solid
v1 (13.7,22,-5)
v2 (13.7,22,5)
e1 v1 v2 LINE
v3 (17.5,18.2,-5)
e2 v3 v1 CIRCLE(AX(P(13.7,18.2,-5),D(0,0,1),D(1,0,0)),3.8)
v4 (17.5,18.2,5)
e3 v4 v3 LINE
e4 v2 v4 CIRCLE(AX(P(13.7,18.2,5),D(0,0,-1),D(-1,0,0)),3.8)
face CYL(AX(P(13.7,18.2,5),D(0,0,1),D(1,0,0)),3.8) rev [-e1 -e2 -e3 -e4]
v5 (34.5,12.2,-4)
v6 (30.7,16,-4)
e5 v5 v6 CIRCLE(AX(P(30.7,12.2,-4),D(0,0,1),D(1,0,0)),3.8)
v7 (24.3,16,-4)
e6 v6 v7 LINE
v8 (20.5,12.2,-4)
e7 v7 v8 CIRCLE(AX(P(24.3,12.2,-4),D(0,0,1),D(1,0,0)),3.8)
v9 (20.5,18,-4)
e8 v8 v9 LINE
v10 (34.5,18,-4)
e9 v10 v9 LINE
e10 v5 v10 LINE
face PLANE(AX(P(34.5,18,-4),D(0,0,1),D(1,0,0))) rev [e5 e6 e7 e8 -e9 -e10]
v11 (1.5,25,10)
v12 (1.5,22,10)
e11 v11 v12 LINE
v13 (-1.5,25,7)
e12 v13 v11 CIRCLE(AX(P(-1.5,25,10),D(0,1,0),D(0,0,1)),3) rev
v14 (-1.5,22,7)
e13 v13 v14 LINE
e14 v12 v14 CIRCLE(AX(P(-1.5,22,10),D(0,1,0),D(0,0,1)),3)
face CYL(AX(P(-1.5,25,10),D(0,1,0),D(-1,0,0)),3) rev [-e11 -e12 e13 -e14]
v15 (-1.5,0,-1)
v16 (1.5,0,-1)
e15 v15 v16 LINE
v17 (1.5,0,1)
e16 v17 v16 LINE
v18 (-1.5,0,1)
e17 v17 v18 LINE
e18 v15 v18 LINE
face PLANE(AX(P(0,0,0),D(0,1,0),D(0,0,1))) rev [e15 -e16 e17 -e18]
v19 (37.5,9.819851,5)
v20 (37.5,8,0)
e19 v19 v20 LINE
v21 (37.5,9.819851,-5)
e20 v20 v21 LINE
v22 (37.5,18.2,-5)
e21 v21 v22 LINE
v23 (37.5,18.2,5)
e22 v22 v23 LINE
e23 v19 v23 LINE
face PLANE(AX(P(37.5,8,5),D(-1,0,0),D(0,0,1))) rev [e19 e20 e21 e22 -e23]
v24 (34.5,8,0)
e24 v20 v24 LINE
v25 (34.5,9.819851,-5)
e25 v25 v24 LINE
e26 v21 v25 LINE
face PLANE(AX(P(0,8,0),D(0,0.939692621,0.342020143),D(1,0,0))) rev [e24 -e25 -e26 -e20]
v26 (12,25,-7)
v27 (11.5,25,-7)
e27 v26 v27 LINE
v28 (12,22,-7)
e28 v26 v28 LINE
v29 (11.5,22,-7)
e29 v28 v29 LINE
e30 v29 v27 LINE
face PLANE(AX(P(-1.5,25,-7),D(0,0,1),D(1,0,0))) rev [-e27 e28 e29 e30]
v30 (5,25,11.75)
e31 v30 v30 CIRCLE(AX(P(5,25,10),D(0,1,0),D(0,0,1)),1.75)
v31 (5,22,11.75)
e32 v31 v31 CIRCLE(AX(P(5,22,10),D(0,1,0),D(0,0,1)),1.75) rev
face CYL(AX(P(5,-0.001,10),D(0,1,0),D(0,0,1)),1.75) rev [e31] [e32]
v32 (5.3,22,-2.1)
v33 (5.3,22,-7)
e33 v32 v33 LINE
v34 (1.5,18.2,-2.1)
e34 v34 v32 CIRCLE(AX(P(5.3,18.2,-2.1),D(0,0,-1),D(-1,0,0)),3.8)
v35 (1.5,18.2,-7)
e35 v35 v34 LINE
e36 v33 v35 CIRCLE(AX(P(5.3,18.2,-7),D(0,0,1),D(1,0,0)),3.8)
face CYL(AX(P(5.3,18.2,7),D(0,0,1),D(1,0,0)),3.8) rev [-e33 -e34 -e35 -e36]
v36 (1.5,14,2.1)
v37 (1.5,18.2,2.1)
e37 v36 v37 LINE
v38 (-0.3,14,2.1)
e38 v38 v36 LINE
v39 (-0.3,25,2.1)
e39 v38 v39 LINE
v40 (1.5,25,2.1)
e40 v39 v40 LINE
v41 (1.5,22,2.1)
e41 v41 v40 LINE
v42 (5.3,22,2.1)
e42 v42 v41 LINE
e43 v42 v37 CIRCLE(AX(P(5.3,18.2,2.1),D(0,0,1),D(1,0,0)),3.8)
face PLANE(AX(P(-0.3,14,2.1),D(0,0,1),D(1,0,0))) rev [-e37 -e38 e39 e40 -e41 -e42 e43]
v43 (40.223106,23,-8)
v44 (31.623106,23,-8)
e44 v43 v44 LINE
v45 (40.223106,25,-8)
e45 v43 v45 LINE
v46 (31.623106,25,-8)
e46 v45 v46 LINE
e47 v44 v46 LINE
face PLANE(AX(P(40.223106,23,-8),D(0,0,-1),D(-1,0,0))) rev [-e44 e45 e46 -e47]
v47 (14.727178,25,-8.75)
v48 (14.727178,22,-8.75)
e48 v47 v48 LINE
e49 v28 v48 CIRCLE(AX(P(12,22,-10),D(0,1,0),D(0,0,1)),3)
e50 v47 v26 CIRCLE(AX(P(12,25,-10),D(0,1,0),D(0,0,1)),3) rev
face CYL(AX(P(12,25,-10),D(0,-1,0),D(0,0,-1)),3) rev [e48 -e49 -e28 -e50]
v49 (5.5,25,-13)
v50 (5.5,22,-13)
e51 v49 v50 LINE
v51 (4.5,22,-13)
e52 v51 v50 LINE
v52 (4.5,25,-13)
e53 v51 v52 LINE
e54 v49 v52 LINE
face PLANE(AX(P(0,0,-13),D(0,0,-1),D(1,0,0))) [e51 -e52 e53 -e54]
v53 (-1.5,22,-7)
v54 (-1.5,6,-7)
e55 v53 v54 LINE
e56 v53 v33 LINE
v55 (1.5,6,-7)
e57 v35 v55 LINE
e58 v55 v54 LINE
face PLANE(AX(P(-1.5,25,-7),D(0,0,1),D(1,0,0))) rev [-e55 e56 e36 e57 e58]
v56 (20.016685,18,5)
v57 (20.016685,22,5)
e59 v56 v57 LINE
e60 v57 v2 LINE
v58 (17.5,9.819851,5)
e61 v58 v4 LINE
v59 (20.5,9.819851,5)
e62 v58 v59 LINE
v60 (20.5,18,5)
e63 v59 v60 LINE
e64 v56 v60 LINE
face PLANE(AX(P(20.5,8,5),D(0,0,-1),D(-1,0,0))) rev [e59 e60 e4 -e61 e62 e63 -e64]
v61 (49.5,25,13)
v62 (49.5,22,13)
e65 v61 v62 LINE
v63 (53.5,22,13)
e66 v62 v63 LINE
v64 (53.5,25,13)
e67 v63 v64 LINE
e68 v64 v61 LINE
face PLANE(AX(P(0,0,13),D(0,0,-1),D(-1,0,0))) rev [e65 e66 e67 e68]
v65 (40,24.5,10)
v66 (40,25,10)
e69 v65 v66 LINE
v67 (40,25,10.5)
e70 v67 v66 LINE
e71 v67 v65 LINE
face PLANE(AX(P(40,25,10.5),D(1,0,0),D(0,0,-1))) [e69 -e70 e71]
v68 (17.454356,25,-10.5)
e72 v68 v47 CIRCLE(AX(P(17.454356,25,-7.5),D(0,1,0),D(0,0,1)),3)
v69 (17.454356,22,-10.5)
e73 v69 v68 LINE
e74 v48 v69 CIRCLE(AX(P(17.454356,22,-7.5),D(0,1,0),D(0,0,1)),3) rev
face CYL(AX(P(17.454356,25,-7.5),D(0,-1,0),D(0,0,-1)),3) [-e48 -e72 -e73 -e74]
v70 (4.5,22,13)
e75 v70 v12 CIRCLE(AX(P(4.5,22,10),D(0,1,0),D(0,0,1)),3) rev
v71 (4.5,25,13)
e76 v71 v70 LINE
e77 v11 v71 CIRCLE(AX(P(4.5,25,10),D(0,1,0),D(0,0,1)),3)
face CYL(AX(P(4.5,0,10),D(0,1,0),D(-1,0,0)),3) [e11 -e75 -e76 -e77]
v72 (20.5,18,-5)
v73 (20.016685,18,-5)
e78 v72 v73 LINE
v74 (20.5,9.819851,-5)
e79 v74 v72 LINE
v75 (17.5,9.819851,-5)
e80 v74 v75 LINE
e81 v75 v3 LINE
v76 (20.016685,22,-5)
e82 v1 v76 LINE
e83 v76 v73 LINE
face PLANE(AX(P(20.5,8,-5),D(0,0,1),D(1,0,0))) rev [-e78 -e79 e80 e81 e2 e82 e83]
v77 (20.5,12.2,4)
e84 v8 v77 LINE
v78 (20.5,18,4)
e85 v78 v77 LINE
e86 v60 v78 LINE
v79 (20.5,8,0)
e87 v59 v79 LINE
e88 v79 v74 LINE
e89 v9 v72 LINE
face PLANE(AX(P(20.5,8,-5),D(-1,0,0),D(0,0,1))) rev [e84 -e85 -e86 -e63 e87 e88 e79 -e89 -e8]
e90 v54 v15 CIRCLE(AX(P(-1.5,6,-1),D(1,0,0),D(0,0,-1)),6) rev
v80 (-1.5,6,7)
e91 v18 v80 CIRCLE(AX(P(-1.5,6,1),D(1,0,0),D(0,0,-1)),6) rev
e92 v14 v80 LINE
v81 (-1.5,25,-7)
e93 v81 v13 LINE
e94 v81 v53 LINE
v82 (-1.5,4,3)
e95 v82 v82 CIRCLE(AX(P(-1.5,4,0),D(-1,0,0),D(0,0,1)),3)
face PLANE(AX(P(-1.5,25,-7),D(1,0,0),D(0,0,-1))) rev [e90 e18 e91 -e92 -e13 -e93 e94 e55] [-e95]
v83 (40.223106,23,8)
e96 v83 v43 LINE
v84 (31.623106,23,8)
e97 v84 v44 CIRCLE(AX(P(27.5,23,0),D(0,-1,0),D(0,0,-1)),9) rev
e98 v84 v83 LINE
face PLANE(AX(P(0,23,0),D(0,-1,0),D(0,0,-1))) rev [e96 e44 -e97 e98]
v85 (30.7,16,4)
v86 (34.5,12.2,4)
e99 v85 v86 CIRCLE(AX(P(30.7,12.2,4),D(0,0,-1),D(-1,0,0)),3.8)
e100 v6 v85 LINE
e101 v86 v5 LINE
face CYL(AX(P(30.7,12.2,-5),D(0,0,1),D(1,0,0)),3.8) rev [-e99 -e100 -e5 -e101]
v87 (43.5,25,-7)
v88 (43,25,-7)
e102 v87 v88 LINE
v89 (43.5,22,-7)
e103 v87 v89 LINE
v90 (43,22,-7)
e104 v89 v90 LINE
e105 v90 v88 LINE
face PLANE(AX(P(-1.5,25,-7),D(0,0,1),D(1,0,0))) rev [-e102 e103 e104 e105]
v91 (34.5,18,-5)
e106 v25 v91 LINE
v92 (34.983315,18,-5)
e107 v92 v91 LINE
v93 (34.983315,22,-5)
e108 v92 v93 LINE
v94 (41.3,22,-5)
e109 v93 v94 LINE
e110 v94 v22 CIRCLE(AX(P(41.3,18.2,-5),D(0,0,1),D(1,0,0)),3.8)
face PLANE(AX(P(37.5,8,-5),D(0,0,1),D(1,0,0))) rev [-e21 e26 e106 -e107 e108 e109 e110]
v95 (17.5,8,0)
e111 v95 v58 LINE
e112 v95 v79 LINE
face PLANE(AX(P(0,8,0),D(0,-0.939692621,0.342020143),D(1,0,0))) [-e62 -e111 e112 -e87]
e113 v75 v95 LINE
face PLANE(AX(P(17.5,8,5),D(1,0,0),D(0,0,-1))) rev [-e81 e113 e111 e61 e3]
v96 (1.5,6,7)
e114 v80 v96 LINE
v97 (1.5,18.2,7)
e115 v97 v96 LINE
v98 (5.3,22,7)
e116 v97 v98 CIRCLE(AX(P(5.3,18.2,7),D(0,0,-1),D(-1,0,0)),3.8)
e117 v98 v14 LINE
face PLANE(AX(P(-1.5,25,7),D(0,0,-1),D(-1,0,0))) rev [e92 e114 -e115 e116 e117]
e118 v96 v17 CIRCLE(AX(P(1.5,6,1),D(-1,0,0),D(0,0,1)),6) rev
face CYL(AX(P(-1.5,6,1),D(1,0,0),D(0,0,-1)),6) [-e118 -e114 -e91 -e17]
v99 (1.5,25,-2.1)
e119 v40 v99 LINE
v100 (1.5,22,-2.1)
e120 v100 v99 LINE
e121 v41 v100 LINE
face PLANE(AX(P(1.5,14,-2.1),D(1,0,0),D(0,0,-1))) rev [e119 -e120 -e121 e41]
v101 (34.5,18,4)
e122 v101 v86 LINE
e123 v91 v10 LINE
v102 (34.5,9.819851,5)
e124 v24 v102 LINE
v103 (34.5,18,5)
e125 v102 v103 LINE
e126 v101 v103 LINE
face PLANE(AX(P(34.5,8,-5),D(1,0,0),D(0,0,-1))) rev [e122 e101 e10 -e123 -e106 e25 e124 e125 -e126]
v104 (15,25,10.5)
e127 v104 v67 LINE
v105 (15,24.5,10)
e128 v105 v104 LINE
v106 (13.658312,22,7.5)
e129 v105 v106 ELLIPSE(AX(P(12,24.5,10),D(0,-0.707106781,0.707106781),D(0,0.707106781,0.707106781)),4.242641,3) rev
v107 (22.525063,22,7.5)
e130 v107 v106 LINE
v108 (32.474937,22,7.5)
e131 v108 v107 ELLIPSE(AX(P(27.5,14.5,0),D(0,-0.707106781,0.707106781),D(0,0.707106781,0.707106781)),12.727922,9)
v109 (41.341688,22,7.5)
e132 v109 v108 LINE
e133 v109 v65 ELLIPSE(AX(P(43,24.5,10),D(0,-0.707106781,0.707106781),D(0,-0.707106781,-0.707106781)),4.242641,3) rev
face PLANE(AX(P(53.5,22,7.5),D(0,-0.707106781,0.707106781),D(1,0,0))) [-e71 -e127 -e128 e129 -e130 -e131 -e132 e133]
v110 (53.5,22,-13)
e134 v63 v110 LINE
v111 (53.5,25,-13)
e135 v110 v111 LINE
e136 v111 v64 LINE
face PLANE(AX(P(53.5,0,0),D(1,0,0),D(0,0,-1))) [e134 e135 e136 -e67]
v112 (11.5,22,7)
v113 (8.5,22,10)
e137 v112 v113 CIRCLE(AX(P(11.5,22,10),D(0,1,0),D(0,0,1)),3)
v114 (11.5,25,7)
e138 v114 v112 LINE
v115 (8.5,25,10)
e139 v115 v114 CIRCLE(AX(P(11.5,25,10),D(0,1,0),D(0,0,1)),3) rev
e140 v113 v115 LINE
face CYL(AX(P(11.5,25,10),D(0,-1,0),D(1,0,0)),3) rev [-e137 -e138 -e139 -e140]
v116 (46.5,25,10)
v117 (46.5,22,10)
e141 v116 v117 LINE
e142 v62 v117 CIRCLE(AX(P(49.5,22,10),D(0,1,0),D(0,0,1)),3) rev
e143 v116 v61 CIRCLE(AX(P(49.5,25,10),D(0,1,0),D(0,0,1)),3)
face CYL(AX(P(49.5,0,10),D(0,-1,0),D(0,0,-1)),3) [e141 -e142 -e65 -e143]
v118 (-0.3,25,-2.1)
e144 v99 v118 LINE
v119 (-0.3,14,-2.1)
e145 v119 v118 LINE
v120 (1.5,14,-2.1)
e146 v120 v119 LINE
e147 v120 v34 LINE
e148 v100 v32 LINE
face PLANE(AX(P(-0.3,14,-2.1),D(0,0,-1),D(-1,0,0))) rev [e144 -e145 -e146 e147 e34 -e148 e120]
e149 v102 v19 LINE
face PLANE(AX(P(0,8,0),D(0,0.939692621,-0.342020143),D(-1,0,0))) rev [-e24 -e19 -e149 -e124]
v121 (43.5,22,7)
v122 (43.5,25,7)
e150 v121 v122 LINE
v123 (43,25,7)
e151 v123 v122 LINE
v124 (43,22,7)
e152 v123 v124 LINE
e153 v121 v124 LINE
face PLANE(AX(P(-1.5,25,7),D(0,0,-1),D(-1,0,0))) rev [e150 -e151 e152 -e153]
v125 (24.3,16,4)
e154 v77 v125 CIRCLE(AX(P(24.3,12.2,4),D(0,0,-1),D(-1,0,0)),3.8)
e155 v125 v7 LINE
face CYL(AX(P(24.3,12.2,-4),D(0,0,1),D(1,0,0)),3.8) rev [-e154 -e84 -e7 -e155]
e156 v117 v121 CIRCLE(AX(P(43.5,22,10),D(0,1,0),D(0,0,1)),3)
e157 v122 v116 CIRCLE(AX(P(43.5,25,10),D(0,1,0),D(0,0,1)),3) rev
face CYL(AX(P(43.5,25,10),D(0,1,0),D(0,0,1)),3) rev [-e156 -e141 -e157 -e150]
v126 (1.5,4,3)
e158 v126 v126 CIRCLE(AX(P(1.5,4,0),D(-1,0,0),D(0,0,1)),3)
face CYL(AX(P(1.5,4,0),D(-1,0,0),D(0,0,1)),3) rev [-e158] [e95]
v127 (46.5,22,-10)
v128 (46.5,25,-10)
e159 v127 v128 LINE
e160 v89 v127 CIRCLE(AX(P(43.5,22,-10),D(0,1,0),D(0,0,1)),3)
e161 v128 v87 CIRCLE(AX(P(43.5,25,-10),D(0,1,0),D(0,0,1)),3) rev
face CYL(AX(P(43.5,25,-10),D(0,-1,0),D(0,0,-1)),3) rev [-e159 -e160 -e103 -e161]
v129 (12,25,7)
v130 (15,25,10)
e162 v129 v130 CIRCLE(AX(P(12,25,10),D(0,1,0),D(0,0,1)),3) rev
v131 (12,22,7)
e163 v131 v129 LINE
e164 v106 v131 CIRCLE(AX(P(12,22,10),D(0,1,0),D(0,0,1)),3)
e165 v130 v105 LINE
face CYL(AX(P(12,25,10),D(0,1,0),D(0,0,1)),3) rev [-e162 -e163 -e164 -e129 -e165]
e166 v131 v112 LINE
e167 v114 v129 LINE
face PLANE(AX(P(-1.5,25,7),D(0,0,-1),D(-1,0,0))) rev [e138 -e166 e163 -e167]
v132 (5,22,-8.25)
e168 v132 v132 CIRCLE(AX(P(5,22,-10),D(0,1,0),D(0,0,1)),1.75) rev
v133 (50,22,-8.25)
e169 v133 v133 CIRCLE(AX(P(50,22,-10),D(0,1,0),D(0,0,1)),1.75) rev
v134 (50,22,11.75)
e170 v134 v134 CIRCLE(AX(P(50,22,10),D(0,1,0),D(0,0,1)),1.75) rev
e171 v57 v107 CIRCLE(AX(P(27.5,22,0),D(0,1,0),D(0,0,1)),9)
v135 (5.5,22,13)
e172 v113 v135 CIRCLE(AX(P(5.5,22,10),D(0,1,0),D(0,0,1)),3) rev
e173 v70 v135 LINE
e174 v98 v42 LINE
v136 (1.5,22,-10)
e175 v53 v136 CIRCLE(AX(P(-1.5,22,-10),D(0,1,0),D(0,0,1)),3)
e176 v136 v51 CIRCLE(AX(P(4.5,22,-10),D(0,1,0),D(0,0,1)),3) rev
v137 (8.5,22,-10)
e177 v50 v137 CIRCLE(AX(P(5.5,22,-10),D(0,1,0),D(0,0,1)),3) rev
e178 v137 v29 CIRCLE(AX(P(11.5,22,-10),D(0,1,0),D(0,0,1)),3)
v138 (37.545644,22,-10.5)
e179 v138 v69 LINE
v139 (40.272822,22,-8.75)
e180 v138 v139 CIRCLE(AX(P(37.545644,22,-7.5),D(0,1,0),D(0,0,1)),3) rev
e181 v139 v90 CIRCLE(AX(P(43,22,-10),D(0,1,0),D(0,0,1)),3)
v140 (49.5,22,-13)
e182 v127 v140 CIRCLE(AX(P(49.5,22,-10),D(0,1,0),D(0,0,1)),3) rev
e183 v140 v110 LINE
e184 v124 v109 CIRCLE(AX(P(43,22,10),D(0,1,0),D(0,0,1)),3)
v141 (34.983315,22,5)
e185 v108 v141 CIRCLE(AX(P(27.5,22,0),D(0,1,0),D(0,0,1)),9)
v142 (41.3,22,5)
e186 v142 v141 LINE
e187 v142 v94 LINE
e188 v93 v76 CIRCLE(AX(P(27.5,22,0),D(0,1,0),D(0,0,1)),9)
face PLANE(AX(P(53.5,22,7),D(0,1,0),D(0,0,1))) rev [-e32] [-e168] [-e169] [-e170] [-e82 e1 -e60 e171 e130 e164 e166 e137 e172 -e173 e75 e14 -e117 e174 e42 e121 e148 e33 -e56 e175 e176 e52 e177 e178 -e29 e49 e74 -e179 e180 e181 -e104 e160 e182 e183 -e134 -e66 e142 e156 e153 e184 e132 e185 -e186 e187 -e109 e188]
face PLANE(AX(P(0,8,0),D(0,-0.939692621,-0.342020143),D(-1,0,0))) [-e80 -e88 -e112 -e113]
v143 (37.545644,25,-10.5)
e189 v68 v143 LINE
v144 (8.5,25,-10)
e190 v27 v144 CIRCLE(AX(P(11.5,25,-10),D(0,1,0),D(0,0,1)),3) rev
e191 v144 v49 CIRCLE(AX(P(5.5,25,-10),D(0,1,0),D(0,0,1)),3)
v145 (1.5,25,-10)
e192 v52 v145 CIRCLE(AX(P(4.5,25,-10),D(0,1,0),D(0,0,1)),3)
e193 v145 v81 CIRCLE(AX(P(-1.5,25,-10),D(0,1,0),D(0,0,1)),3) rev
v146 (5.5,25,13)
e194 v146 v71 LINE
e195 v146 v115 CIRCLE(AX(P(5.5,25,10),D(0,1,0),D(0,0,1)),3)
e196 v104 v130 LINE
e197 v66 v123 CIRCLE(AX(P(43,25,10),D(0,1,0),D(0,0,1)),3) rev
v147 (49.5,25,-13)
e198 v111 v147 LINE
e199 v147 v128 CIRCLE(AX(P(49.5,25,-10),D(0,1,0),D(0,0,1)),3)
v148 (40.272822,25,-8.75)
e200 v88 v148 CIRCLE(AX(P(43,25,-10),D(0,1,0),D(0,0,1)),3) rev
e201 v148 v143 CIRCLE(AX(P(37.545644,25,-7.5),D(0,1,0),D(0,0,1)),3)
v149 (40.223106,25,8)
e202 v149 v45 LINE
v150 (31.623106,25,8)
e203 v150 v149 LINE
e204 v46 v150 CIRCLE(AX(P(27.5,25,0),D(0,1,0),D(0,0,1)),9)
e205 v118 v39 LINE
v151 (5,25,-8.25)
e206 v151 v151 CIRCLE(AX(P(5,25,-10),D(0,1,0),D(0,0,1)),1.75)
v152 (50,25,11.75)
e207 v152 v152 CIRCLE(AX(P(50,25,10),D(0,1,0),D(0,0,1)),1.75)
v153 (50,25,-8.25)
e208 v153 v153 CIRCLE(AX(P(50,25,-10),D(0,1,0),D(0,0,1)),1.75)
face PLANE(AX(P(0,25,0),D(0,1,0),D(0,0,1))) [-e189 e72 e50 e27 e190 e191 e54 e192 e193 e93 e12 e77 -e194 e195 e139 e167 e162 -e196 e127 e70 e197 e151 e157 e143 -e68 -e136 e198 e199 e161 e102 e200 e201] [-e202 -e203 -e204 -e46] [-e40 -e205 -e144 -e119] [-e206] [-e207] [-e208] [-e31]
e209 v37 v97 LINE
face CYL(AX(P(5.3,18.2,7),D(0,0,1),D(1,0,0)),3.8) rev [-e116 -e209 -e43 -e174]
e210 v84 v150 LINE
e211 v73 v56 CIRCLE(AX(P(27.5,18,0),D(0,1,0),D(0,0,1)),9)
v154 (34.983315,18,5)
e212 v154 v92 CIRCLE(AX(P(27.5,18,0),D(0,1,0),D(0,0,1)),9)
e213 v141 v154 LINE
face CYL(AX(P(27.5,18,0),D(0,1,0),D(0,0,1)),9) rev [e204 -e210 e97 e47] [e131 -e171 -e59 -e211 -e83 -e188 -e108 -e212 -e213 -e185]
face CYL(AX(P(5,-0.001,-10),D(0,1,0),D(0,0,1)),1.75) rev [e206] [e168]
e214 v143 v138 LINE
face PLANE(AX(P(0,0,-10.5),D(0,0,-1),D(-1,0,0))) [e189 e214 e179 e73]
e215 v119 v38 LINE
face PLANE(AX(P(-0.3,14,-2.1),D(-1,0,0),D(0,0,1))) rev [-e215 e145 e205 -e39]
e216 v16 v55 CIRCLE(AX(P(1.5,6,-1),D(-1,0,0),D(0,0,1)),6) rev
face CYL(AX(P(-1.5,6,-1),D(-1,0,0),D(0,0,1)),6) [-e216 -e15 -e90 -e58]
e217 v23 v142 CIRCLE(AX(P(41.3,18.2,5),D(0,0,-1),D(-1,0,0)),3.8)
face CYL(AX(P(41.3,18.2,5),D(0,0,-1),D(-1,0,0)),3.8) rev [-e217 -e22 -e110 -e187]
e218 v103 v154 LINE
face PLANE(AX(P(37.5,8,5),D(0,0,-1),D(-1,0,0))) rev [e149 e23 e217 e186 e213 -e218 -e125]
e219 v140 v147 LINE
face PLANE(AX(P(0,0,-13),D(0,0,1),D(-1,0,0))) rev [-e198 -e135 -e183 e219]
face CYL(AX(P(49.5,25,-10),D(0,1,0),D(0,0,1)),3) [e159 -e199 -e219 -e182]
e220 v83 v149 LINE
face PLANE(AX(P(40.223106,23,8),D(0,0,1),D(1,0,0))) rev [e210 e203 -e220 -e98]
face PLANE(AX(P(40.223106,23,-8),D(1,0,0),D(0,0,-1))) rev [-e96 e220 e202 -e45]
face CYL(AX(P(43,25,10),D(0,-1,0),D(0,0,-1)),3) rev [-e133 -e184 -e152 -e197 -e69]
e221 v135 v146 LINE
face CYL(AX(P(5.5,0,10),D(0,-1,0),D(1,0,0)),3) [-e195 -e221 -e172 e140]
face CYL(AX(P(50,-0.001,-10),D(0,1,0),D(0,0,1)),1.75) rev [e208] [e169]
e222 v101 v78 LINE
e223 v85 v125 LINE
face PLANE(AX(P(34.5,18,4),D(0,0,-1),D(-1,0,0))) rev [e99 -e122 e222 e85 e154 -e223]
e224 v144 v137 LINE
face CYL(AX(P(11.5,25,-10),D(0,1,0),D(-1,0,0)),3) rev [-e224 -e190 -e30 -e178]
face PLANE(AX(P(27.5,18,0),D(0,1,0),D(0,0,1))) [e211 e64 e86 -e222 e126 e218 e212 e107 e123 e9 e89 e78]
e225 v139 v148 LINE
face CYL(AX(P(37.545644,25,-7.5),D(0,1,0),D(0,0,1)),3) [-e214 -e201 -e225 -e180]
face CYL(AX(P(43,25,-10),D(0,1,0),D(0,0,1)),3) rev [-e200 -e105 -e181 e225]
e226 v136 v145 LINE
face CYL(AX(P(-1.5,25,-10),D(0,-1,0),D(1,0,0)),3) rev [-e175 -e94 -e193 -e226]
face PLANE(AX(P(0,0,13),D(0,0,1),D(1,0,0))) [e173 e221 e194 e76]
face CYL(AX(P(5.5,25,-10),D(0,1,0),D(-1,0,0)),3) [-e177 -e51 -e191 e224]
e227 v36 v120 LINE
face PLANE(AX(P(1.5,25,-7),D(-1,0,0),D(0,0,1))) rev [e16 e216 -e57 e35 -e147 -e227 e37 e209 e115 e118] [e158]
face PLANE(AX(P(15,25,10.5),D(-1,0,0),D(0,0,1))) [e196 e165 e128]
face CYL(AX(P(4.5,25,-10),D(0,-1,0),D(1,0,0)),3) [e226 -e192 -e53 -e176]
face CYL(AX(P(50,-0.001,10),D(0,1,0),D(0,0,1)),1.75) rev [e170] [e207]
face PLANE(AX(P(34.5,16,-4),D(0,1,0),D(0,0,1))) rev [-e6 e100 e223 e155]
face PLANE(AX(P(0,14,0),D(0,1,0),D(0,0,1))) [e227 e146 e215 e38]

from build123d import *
from OCP.BRepFilletAPI import BRepFilletAPI_MakeChamfer

# Parameters (mm, degrees)
SKETCH1_W           = 3
SKETCH1_H           = 14
BOSS_EXTRUDE1_DEPTH = 25
SKETCH2_R           = 3
CUT_EXTRUDE1_DEPTH  = 27.134268691
SKETCH3_W           = 14
SKETCH3_H           = 3
BOSS_EXTRUDE2_DEPTH = 52
SKETCH4_W           = 3
SKETCH4_H           = 10
BOSS_EXTRUDE3_DEPTH = 14
CHAMFER1_SIZE       = 1.819851171
CHAMFER1_SIZE_2     = 5
SKETCH6_W           = 25
SKETCH6_H           = 3
BOSS_EXTRUDE5_DEPTH = 3.5
SKETCH5_W           = 7
SKETCH5_H           = 3
BOSS_EXTRUDE4_DEPTH = 6
SKETCH7_R           = 9
CUT_EXTRUDE2_DEPTH  = 7
CHAMFER2_SIZE       = 3
SKETCH8_W           = 8
SKETCH8_H           = 2
BOSS_EXTRUDE6_DEPTH = 14
SKETCH9_W           = 8.6
SKETCH9_H           = 16
CUT_EXTRUDE3_DEPTH  = 2
CUT_EXTRUDE4_REACH  = 62.467
SKETCH10_R          = 1.75
SKETCH11_W          = 1.8
SKETCH11_H          = 4.2
CUT_EXTRUDE5_DEPTH  = 11
FILLET1_R           = 3
FILLET2_R           = 3
FILLET3_R           = 3.8
FILLET4_R           = 6


# Some blends are built 0.0001 mm under size
with BuildPart() as part:
    # Sketch1 → Boss-Extrude1 (new body)
    with BuildSketch(Plane(origin=(0, 0, 0), x_dir=(1, 0, 0), z_dir=(0, 1, 0))):
        Rectangle(SKETCH1_W, SKETCH1_H)
    extrude(amount=BOSS_EXTRUDE1_DEPTH)

    # Sketch2 → Cut-Extrude1 (cut, through all)
    with BuildSketch(Plane.ZY.offset(1.5)):
        with Locations((0, 4)):
            Circle(SKETCH2_R)
    extrude(amount=-CUT_EXTRUDE1_DEPTH, mode=Mode.SUBTRACT)

    # Sketch3 → Boss-Extrude2 (add)
    with BuildSketch(Plane(origin=(1.5, 0, 0), x_dir=(0, 0, -1), z_dir=(1, 0, 0))):
        with Locations((0, 23.5)):
            Rectangle(SKETCH3_W, SKETCH3_H)
    extrude(amount=BOSS_EXTRUDE2_DEPTH)

    # Sketch4 → Boss-Extrude3 (add)
    with BuildSketch(Plane.XZ.offset(-22)):
        with Locations((36, 0)):
            Rectangle(SKETCH4_W, SKETCH4_H)
        with Locations((19, 0)):
            Rectangle(SKETCH4_W, SKETCH4_H)
    extrude(amount=BOSS_EXTRUDE3_DEPTH)

    # Chamfer1
    chamfer1_edges_1 = [part.edges().sort_by_distance(p)[0] for p in [
        (36, 8, -5),
    ]]
    chamfer1_side_1 = [part.faces().sort_by_distance(p)[0] for p in [
        (36, 8.036397023, -5),
    ]]
    chamfer1_edges_2 = [part.edges().sort_by_distance(p)[0] for p in [
        (36, 8, 5),
    ]]
    chamfer1_side_2 = [part.faces().sort_by_distance(p)[0] for p in [
        (36, 8.036397023, 5),
    ]]
    chamfer1_edges_3 = [part.edges().sort_by_distance(p)[0] for p in [
        (19, 8, 5),
    ]]
    chamfer1_side_3 = [part.faces().sort_by_distance(p)[0] for p in [
        (19, 8.036397023, 5),
    ]]
    chamfer1_edges_4 = [part.edges().sort_by_distance(p)[0] for p in [
        (19, 8, -5),
    ]]
    chamfer1_side_4 = [part.faces().sort_by_distance(p)[0] for p in [
        (19, 8.036397023, -5),
    ]]
    chamfer1 = BRepFilletAPI_MakeChamfer(part.part.solid().wrapped)
    for e in chamfer1_edges_1:
        chamfer1.Add(CHAMFER1_SIZE - 0.0001, CHAMFER1_SIZE_2 - 0.0001, e.wrapped, chamfer1_side_1[0].wrapped)
    for e in chamfer1_edges_2:
        chamfer1.Add(CHAMFER1_SIZE - 0.0001, CHAMFER1_SIZE_2 - 0.0001, e.wrapped, chamfer1_side_2[0].wrapped)
    for e in chamfer1_edges_3:
        chamfer1.Add(CHAMFER1_SIZE - 0.0001, CHAMFER1_SIZE_2 - 0.0001, e.wrapped, chamfer1_side_3[0].wrapped)
    for e in chamfer1_edges_4:
        chamfer1.Add(CHAMFER1_SIZE - 0.0001, CHAMFER1_SIZE_2 - 0.0001, e.wrapped, chamfer1_side_4[0].wrapped)
    add(Compound.cast(chamfer1.Shape()), mode=Mode.REPLACE)  # a hair under: the kernel refuses the full size

    # Sketch6 → Boss-Extrude5 (add)
    with BuildSketch(Plane(origin=(0, 0, -7), x_dir=(-1, 0, 0), z_dir=(0, 0, -1))):
        with Locations((-27.5, 23.5)):
            Rectangle(SKETCH6_W, SKETCH6_H)
    boss_extrude5 = extrude(amount=BOSS_EXTRUDE5_DEPTH)

    # Sketch5 → Boss-Extrude4 (add)
    with BuildSketch(Plane.XY.offset(7)):
        with Locations((5, 23.5)):
            Rectangle(SKETCH5_W, SKETCH5_H)
        with Locations((50, 23.5)):
            Rectangle(SKETCH5_W, SKETCH5_H)
    boss_extrude4 = extrude(amount=BOSS_EXTRUDE4_DEPTH)

    # Mirror1: Boss-Extrude5, Boss-Extrude4 across plane
    add(boss_extrude5.mirror(Plane.XY))
    add(boss_extrude4.mirror(Plane.XY))

    # Sketch7 → Cut-Extrude2 (cut)
    with BuildSketch(Plane(origin=(0, 25, 0), x_dir=(1, 0, 0), z_dir=(0, 1, 0))):
        with Locations(Location((27.5, 0, 0), (0, 0, 270))):
            Circle(SKETCH7_R)
    extrude(amount=-CUT_EXTRUDE2_DEPTH, mode=Mode.SUBTRACT)

    # Chamfer2
    # the kernel refuses this chamfer: 3 mm, written as the material it takes off along each edge
    with BuildSketch(Plane(origin=(15, 22, 10.5), x_dir=(0, -0.027495876610587926, -0.9996219169112968), z_dir=(1, 0, 0))) as chamfer2_piece_1:
        Polygon((CHAMFER2_SIZE * 0.999621916911, CHAMFER2_SIZE * 0.0274958766106), (-CHAMFER2_SIZE * 0.0274958766106, CHAMFER2_SIZE * 0.999621916911), (0, 0), align=None)
    extrude(amount=25, mode=Mode.SUBTRACT)

    # Sketch8 → Boss-Extrude6 (add)
    with BuildSketch(Plane(origin=(20.5, 0, 0), x_dir=(0, 0, -1), z_dir=(1, 0, 0))):
        with Locations((0, 17)):
            Rectangle(SKETCH8_W, SKETCH8_H)
    extrude(amount=BOSS_EXTRUDE6_DEPTH)

    # Sketch9 → Cut-Extrude3 (cut)
    with BuildSketch(Plane(origin=(0, 25, 0), x_dir=(1, 0, 0), z_dir=(0, 1, 0))):
        with Locations((35.923105626, 0)):
            Rectangle(SKETCH9_W, SKETCH9_H)
    extrude(amount=-CUT_EXTRUDE3_DEPTH, mode=Mode.SUBTRACT)

    # Sketch10 → Cut-Extrude4 (cut, up to next)
    with BuildSketch(Plane(origin=(0, 25, 0), x_dir=(1, 0, 0), z_dir=(0, 1, 0)), mode=Mode.PRIVATE) as cut_extrude4_sk1:
        with Locations(Location((5, -10, 0), (0, 0, 270))):
            Circle(SKETCH10_R)
    cut_extrude4_tool1 = extrude(cut_extrude4_sk1.sketch, amount=-CUT_EXTRUDE4_REACH, mode=Mode.PRIVATE) & part.part
    # Sketch10 → Cut-Extrude4 (cut, up to next)
    with BuildSketch(Plane(origin=(0, 25, 0), x_dir=(1, 0, 0), z_dir=(0, 1, 0)), mode=Mode.PRIVATE) as cut_extrude4_sk2:
        with Locations(Location((50, -10, 0), (0, 0, 270))):
            Circle(SKETCH10_R)
    cut_extrude4_tool2 = extrude(cut_extrude4_sk2.sketch, amount=-CUT_EXTRUDE4_REACH, mode=Mode.PRIVATE) & part.part
    # Sketch10 → Cut-Extrude4 (cut, up to next)
    with BuildSketch(Plane(origin=(0, 25, 0), x_dir=(1, 0, 0), z_dir=(0, 1, 0)), mode=Mode.PRIVATE) as cut_extrude4_sk3:
        with Locations(Location((50, 10, 0), (0, 0, 270))):
            Circle(SKETCH10_R)
    cut_extrude4_tool3 = extrude(cut_extrude4_sk3.sketch, amount=-CUT_EXTRUDE4_REACH, mode=Mode.PRIVATE) & part.part
    # Sketch10 → Cut-Extrude4 (cut, up to next)
    with BuildSketch(Plane(origin=(0, 25, 0), x_dir=(1, 0, 0), z_dir=(0, 1, 0)), mode=Mode.PRIVATE) as cut_extrude4_sk4:
        with Locations(Location((5, 10, 0), (0, 0, 270))):
            Circle(SKETCH10_R)
    cut_extrude4_tool4 = extrude(cut_extrude4_sk4.sketch, amount=-CUT_EXTRUDE4_REACH, mode=Mode.PRIVATE) & part.part
    add(cut_extrude4_tool1.solids().sort_by_distance((5, 25, 10))[0], mode=Mode.SUBTRACT)
    add(cut_extrude4_tool2.solids().sort_by_distance((50, 25, 10))[0], mode=Mode.SUBTRACT)
    add(cut_extrude4_tool3.solids().sort_by_distance((50, 25, -10))[0], mode=Mode.SUBTRACT)
    add(cut_extrude4_tool4.solids().sort_by_distance((5, 25, -10))[0], mode=Mode.SUBTRACT)

    # Sketch11 → Cut-Extrude5 (cut)
    with BuildSketch(Plane(origin=(0, 25, 0), x_dir=(1, 0, 0), z_dir=(0, 1, 0))):
        with Locations((0.6, 0)):
            Rectangle(SKETCH11_W, SKETCH11_H)
    extrude(amount=-CUT_EXTRUDE5_DEPTH, mode=Mode.SUBTRACT)

    # Fillet1
    # the kernel refuses this fillet: 3 mm, written as the material it adds along each edge
    with BuildSketch(Plane(origin=(46.5, 22, 7), x_dir=(0, 0, 1), z_dir=(0, 1, 0)), Plane(origin=(8.5, 25, 7), x_dir=(0, 0, 1), z_dir=(0, -1, 0)), Plane(origin=(1.5, 22, 7), x_dir=(0, 0, 1), z_dir=(0, 1, 0)), Plane(origin=(46.5, 22, -7), x_dir=(-1, 0, 0), z_dir=(0, 1, 0))) as fillet1_piece_1:
        with BuildLine():
            CenterArc((FILLET1_R, -FILLET1_R), FILLET1_R, 90, 90)
            Line((0, -FILLET1_R), (0, 0))
            Line((0, 0), (FILLET1_R, 0))
        make_face()
    extrude(amount=3)
    with BuildSketch(Plane(origin=(40, 22, 7), x_dir=(1, 0, 0), z_dir=(0, 1, 0))) as fillet1_piece_2_section:
        with BuildLine():
            CenterArc((FILLET1_R, -FILLET1_R), FILLET1_R, 90, 90)
            Line((0, -FILLET1_R), (0, 0))
            Line((0, 0), (FILLET1_R, 0))
        make_face()
    fillet1_piece_2 = extrude(amount=8.5, mode=Mode.PRIVATE)
    fillet1_piece_2 = split(fillet1_piece_2, bisect_by=Plane(origin=(40.974089344, 22.187586332, 7.687586332), z_dir=(0, 0.7071067811862648, -0.7071067811868302)), keep=Keep.TOP, mode=Mode.PRIVATE)
    fillet1_piece_2 = split(fillet1_piece_2, bisect_by=Plane(origin=(40.974089344, 25, 7.348410065), z_dir=(0, -1, 0)), keep=Keep.TOP, mode=Mode.PRIVATE)
    fillet1_piece_2 = split(fillet1_piece_2, bisect_by=Plane(origin=(40.223105626, 22.526762599, 7.348410065), z_dir=(1, 0, 0)), keep=Keep.TOP, mode=Mode.PRIVATE)
    add(fillet1_piece_2)
    with BuildSketch(Plane(origin=(40, 22, 7), x_dir=(1, 0, 0), z_dir=(0, 1, 0))) as fillet1_piece_3_section:
        with BuildLine():
            CenterArc((FILLET1_R, -FILLET1_R), FILLET1_R, 90, 90)
            Line((0, -FILLET1_R), (0, 0))
            Line((0, 0), (FILLET1_R, 0))
        make_face()
    fillet1_piece_3 = extrude(amount=1, mode=Mode.PRIVATE)
    fillet1_piece_3 = split(fillet1_piece_3, bisect_by=Plane(origin=(40.111552813, 22.25, 7.75), z_dir=(0, 0.7071067811862648, -0.7071067811868302)), keep=Keep.TOP, mode=Mode.PRIVATE)
    add(fillet1_piece_3)
    with BuildSketch(Plane(origin=(40, 14.5, 7), x_dir=(1, 0, 0), z_dir=(0, 1, 0))) as fillet1_piece_4_section:
        with BuildLine():
            CenterArc((FILLET1_R, -FILLET1_R), FILLET1_R, 90, 90)
            Line((0, -FILLET1_R), (0, 0))
            Line((0, 0), (FILLET1_R, 0))
        make_face()
    fillet1_piece_4 = extrude(amount=16, mode=Mode.PRIVATE)
    fillet1_piece_4 = split(fillet1_piece_4, bisect_by=Plane(origin=(40.102150249, 23.589388324, 9.089388324), z_dir=(0, 0.7071067811862648, -0.7071067811868302)), keep=Keep.TOP, mode=Mode.PRIVATE)
    fillet1_piece_4 = split(fillet1_piece_4, bisect_by=Plane(origin=(40.102150249, 25, 8.580734209), z_dir=(0, -1, 0)), keep=Keep.TOP, mode=Mode.PRIVATE)
    fillet1_piece_4 = split(fillet1_piece_4, bisect_by=Plane(origin=(40.102150249, 24.098042439, 8), z_dir=(0, 0, 1)), keep=Keep.TOP, mode=Mode.PRIVATE)
    add(fillet1_piece_4)
    with BuildSketch(Plane(origin=(15, 25, 7), x_dir=(-1, 0, 0), z_dir=(0, -1, 0))) as fillet1_piece_5_section:
        with BuildLine():
            CenterArc((FILLET1_R, -FILLET1_R), FILLET1_R, 90, 90)
            Line((0, -FILLET1_R), (0, 0))
            Line((0, 0), (FILLET1_R, 0))
        make_face()
    fillet1_piece_5 = extrude(amount=3, mode=Mode.PRIVATE)
    fillet1_piece_5 = split(fillet1_piece_5, bisect_by=Plane(origin=(14.281357865, 22.846943588, 8.346943588), z_dir=(0, 0.7071067811862648, -0.7071067811868302)), keep=Keep.TOP, mode=Mode.PRIVATE)
    add(fillet1_piece_5)
    with BuildSketch(Plane(origin=(1.5, 22, -7), x_dir=(0, 0, -1), z_dir=(0, 1, 0)), Plane(origin=(8.5, 25, -7), x_dir=(0, 0, -1), z_dir=(0, -1, 0)), Plane(origin=(15, 25, -7), x_dir=(-1, 0, 0), z_dir=(0, -1, 0))) as fillet1_piece_6:
        with BuildLine():
            CenterArc((FILLET1_R, FILLET1_R), FILLET1_R, 180, 90)
            Line((0, FILLET1_R), (0, 0))
            Line((0, 0), (FILLET1_R, 0))
        make_face()
    extrude(amount=3)
    with BuildSketch(Plane(origin=(40, 22, -7), x_dir=(0, 0, -1), z_dir=(0, 1, 0))) as fillet1_piece_7_section:
        with BuildLine():
            CenterArc((FILLET1_R, -FILLET1_R), FILLET1_R, 90, 90)
            Line((0, -FILLET1_R), (0, 0))
            Line((0, 0), (FILLET1_R, 0))
        make_face()
    fillet1_piece_7 = extrude(amount=8.5, mode=Mode.PRIVATE)
    fillet1_piece_7 = split(fillet1_piece_7, bisect_by=Plane(origin=(40.097980222, 25, -8.647383522), z_dir=(0, -1, 0)), keep=Keep.TOP, mode=Mode.PRIVATE)
    fillet1_piece_7 = split(fillet1_piece_7, bisect_by=Plane(origin=(40.097980222, 22.5, -8), z_dir=(0, 0, -1)), keep=Keep.TOP, mode=Mode.PRIVATE)
    add(fillet1_piece_7)
    with BuildSketch(Plane(origin=(40, 22, -7), x_dir=(0, 0, -1), z_dir=(0, 1, 0))) as fillet1_piece_8:
        with BuildLine():
            CenterArc((FILLET1_R, -FILLET1_R), FILLET1_R, 90, 90)
            Line((0, -FILLET1_R), (0, 0))
            Line((0, 0), (FILLET1_R, 0))
        make_face()
    extrude(amount=1)
    with BuildSketch(Plane(origin=(40, 14.5, -7), x_dir=(0, 0, -1), z_dir=(0, 1, 0))) as fillet1_piece_9_section:
        with BuildLine():
            CenterArc((FILLET1_R, -FILLET1_R), FILLET1_R, 90, 90)
            Line((0, -FILLET1_R), (0, 0))
            Line((0, 0), (FILLET1_R, 0))
        make_face()
    fillet1_piece_9 = extrude(amount=16, mode=Mode.PRIVATE)
    fillet1_piece_9 = split(fillet1_piece_9, bisect_by=Plane(origin=(40.946316816, 25, -7.381877422), z_dir=(0, -1, 0)), keep=Keep.TOP, mode=Mode.PRIVATE)
    fillet1_piece_9 = split(fillet1_piece_9, bisect_by=Plane(origin=(40.946316816, 23, -7.381877422), z_dir=(0, 1, 0)), keep=Keep.TOP, mode=Mode.PRIVATE)
    fillet1_piece_9 = split(fillet1_piece_9, bisect_by=Plane(origin=(40.223105626, 24, -7.381877422), z_dir=(1, 0, 0)), keep=Keep.TOP, mode=Mode.PRIVATE)
    add(fillet1_piece_9)

    # Fillet2
    fillet2_edges = [part.edges().sort_by_distance(p)[0] for p in [
        (46.5, 23.5, 13),
        (46.5, 23.5, -13),
        (40, 23.5, -10.5),
        (15, 23.5, -10.5),
        (8.5, 23.5, 13),
        (1.5, 23.5, 13),
        (1.5, 23.5, -13),
        (8.5, 23.5, -13),
    ]]
    fillet(fillet2_edges, radius=FILLET2_R - 0.0001)  # a hair under: the kernel refuses the full size

    # Fillet3
    fillet3_edges = [part.edges().sort_by_distance(p)[0] for p in [
        (20.5, 16, 0),
        (34.5, 16, 0),
        (1.5, 22, 4.55),
        (1.5, 22, -4.55),
        (17.5, 22, 0),
        (37.5, 22, 0),
    ]]
    fillet(fillet3_edges, radius=FILLET3_R)

    # Fillet4
    fillet4_edges = [part.edges().sort_by_distance(p)[0] for p in [
        (0, 0, 7),
        (0, 0, -7),
    ]]
    fillet(fillet4_edges, radius=FILLET4_R)


solid = part.part
